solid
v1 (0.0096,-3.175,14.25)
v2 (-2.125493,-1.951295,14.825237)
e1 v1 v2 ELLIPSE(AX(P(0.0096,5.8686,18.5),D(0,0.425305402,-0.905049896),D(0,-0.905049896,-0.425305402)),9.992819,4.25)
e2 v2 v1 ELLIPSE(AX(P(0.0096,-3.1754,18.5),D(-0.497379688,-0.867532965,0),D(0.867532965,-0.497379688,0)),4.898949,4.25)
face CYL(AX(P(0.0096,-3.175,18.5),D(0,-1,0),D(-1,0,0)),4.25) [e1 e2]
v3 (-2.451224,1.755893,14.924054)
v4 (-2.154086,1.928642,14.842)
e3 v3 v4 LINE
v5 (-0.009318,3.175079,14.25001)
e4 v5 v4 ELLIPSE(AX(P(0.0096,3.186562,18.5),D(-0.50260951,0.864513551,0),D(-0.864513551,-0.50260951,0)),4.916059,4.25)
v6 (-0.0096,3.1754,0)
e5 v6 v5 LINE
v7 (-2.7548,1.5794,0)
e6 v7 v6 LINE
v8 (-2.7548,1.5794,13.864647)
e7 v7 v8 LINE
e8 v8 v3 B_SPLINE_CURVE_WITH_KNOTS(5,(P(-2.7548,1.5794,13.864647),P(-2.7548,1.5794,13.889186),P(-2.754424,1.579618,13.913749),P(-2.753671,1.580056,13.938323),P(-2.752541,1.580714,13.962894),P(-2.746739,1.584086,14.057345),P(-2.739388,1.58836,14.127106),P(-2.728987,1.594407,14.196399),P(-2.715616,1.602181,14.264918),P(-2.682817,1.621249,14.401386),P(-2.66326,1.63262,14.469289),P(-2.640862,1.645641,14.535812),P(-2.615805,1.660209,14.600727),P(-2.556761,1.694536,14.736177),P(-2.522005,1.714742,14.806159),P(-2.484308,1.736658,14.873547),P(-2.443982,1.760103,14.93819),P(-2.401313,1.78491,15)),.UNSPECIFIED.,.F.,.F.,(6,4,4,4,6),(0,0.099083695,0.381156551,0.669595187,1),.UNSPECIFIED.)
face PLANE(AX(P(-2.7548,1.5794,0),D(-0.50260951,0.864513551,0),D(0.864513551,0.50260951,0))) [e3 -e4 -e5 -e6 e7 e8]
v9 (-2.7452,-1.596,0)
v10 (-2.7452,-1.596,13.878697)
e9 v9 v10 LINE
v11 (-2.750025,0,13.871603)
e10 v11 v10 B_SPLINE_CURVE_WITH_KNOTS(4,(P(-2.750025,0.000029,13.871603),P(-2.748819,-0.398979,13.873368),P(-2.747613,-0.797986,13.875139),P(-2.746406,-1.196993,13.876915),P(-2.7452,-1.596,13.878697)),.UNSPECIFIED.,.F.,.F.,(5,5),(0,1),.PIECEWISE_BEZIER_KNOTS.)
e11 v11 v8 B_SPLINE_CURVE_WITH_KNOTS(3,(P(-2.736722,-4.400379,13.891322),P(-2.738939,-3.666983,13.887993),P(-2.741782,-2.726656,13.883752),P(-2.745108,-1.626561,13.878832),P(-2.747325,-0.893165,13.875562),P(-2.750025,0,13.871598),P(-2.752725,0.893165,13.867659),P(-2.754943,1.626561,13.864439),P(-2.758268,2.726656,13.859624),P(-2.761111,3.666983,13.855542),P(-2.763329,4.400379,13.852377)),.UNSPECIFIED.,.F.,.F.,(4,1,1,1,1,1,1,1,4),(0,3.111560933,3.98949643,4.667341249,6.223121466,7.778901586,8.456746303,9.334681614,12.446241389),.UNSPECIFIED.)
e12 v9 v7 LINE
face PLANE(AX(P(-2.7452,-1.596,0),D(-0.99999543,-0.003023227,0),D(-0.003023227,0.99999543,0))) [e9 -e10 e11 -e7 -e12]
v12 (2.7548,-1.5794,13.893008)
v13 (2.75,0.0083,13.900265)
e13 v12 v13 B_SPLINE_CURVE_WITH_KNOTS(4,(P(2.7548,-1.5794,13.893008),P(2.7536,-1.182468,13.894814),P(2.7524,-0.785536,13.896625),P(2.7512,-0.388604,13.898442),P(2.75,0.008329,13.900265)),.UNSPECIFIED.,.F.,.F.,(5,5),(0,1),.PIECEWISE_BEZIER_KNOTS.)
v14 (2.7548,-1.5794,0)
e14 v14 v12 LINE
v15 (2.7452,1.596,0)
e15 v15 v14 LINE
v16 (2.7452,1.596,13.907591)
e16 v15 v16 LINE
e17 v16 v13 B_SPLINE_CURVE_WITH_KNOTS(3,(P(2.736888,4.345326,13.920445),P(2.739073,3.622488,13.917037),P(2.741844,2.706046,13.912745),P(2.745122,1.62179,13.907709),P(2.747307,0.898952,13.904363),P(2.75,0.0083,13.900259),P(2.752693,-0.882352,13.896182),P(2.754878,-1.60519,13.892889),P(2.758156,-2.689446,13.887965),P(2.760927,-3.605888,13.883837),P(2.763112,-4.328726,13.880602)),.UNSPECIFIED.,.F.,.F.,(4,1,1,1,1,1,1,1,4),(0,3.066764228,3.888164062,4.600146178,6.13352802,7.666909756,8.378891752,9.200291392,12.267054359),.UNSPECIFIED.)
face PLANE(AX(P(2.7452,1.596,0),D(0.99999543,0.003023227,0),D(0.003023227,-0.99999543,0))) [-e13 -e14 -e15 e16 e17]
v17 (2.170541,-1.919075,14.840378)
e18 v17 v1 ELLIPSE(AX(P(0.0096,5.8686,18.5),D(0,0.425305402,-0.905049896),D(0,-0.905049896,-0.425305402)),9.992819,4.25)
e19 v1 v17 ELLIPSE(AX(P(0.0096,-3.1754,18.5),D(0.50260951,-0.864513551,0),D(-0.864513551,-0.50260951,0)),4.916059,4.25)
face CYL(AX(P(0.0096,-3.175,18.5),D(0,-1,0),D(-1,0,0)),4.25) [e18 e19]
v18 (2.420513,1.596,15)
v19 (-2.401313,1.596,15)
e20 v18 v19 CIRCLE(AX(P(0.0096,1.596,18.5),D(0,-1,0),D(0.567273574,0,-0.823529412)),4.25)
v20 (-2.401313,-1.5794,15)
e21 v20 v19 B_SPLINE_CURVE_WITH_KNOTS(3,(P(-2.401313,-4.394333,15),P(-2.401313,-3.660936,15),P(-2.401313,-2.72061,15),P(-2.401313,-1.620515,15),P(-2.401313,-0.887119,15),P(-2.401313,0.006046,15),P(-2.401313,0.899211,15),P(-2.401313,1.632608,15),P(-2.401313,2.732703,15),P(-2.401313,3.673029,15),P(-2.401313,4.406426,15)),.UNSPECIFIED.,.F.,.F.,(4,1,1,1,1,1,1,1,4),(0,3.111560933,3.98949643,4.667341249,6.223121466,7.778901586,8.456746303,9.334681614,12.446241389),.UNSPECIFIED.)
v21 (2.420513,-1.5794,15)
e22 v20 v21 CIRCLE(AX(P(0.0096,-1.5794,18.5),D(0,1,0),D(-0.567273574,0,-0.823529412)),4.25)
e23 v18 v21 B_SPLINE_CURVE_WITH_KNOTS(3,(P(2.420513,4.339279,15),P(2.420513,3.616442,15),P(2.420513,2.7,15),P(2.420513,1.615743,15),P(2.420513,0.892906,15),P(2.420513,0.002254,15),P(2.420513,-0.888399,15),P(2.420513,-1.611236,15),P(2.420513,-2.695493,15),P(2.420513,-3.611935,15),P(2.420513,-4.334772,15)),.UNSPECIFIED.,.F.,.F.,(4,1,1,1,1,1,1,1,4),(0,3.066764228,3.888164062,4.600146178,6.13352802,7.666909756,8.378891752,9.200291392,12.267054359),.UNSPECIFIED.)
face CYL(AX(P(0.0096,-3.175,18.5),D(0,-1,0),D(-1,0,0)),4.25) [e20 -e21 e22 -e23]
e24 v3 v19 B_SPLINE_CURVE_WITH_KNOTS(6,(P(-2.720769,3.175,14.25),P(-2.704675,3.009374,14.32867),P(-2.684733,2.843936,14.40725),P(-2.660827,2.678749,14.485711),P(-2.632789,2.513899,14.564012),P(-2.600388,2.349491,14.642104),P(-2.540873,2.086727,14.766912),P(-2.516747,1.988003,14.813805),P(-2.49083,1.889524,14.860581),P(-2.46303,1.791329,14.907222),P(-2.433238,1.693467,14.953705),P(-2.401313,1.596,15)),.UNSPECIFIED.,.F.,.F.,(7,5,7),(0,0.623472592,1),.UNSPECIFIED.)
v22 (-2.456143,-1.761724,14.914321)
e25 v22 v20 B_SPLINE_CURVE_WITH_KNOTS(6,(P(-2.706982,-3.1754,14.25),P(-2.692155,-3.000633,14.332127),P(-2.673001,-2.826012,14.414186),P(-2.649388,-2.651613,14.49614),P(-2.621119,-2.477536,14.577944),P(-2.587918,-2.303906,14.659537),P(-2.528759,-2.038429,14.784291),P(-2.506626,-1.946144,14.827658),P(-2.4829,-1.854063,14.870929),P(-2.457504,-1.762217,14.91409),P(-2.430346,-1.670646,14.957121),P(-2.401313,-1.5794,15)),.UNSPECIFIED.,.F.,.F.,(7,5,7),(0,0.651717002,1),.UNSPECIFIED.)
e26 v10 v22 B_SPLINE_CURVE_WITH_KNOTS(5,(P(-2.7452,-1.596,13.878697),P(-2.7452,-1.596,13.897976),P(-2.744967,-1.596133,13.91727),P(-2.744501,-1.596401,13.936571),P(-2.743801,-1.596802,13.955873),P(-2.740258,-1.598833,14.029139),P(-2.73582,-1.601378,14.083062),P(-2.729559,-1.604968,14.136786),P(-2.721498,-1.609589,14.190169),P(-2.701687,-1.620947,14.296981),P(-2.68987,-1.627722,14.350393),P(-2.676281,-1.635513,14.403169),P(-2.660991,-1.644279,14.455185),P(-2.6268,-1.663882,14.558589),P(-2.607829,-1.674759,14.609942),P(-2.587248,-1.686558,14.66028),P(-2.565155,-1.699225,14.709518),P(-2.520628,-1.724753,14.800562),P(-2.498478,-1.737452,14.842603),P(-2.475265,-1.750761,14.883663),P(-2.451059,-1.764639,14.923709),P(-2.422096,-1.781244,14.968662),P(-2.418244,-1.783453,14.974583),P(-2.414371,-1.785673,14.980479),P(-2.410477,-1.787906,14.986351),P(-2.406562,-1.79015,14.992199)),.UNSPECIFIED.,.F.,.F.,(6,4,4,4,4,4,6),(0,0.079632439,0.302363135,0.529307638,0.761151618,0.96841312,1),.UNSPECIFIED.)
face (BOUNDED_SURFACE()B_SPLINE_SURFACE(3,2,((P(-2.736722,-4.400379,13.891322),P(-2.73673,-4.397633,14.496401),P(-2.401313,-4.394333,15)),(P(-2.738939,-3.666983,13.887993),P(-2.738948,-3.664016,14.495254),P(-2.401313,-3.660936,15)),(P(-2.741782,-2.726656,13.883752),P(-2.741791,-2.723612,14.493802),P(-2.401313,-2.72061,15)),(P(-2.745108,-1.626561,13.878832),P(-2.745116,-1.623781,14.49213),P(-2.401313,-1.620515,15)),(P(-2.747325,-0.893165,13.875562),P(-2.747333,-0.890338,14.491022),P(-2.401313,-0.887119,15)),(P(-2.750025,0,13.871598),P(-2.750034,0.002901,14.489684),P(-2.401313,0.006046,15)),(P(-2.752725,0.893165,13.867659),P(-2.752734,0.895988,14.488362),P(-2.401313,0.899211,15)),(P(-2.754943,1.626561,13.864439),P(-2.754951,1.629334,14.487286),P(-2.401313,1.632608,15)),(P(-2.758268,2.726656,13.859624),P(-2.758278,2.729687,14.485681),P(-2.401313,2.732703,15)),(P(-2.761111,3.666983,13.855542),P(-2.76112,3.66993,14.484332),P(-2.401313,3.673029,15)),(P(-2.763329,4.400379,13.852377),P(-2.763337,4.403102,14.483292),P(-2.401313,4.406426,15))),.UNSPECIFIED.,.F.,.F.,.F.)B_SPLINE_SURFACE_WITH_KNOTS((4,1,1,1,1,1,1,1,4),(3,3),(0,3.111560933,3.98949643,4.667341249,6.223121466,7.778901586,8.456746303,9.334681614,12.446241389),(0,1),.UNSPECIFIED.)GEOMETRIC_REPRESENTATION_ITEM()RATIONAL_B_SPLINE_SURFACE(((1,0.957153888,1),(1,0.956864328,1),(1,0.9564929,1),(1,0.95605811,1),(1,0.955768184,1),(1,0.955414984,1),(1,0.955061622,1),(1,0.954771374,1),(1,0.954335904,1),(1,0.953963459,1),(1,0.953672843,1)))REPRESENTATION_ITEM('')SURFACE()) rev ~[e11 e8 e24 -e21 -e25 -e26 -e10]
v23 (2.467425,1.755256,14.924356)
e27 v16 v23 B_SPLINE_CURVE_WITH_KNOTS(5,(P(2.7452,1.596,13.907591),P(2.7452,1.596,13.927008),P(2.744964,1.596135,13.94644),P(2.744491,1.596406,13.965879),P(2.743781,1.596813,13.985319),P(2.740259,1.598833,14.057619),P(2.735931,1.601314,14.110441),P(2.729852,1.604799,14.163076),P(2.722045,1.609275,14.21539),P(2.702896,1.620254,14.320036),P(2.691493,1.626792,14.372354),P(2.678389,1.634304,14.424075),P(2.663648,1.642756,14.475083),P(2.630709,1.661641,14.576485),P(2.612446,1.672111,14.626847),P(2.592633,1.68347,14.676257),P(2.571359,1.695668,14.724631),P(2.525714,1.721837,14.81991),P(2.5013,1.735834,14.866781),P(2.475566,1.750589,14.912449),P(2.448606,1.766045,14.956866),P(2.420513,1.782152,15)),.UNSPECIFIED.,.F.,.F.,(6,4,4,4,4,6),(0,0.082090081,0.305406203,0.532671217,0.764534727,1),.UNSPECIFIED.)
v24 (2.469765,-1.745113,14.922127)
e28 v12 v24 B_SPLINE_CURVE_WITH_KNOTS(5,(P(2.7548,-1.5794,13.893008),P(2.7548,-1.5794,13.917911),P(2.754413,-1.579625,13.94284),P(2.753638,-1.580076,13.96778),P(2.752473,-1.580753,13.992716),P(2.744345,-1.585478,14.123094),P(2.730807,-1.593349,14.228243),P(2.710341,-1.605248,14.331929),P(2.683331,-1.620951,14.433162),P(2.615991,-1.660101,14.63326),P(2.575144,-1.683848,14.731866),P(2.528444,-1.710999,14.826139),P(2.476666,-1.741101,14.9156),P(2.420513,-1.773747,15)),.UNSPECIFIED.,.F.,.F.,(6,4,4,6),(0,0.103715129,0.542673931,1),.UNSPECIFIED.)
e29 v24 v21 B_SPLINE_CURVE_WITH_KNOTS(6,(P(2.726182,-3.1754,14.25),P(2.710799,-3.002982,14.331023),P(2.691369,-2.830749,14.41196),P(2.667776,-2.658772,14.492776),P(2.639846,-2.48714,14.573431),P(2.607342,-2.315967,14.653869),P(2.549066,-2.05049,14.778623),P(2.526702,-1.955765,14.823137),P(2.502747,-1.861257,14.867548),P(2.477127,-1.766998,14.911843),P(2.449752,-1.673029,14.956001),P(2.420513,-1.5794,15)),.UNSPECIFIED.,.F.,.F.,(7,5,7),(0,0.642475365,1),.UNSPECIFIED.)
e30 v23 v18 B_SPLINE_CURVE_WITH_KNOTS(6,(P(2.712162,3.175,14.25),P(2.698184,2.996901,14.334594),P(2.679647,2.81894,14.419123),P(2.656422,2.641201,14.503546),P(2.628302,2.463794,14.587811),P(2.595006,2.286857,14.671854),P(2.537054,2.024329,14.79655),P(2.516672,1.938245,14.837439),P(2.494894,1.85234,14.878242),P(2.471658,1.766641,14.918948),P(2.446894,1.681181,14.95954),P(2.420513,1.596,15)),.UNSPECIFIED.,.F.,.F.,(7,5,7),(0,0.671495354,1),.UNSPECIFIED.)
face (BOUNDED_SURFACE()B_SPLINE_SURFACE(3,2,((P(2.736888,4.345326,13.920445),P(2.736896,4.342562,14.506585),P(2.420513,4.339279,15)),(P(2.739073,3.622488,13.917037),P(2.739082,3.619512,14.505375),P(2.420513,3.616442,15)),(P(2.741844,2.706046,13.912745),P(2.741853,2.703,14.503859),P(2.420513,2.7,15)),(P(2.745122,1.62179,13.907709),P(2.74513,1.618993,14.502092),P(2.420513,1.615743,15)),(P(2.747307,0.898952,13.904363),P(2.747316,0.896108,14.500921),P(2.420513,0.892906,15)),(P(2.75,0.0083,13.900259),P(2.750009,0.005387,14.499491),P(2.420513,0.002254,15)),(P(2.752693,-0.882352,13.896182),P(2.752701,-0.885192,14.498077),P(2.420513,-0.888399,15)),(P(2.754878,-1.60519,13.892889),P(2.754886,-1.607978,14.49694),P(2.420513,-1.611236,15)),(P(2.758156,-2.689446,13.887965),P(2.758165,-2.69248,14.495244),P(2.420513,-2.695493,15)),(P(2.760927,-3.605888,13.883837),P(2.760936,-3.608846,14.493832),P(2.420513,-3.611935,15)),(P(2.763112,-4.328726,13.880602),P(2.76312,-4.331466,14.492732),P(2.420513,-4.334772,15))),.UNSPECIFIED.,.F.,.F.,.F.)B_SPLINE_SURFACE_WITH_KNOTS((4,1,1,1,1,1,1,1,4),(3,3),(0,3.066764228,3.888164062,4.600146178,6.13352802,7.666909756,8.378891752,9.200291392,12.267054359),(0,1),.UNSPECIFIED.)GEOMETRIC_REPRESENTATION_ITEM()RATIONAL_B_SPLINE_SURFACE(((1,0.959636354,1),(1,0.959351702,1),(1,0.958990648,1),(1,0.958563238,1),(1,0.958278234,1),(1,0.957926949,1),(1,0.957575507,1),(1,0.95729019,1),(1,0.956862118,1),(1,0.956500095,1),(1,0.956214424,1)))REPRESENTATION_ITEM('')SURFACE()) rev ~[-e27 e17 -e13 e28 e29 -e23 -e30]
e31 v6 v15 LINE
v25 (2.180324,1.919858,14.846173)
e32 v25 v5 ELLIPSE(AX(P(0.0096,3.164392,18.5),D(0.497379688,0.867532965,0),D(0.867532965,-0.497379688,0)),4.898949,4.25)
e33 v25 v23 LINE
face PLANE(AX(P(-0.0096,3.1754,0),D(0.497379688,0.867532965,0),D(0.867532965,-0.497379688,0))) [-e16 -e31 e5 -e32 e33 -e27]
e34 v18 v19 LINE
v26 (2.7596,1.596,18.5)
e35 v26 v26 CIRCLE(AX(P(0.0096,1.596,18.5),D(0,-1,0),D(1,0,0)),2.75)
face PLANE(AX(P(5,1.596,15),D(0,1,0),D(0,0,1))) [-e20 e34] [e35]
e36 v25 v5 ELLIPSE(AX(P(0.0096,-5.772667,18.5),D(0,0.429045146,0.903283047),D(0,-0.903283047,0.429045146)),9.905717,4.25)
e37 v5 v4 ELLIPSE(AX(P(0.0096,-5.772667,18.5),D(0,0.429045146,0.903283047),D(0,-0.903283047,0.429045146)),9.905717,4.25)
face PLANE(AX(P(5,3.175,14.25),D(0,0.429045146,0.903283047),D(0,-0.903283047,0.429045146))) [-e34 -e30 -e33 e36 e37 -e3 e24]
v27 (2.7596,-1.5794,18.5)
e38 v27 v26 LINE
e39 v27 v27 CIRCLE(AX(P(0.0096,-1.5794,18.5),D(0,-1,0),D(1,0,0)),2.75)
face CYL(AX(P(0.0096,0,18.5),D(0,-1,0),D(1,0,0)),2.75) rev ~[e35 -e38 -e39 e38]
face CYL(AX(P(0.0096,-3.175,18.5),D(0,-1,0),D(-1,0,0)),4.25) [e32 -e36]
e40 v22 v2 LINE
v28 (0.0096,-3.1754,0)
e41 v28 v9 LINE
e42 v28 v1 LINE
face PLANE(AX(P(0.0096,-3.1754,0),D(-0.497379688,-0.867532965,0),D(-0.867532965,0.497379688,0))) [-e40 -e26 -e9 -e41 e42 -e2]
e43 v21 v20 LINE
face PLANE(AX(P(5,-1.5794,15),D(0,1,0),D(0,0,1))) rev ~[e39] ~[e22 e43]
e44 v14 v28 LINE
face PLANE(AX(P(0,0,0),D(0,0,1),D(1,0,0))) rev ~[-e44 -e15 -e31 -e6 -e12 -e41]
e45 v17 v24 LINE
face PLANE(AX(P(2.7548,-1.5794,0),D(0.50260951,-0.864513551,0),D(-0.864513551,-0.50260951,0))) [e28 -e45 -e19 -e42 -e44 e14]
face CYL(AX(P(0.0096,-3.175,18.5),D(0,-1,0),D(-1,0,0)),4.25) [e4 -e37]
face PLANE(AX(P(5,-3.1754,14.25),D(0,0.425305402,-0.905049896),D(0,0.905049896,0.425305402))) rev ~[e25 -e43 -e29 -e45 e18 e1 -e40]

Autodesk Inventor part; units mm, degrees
sketch "Boceto1" plane through (0, 0, 0) normal (0, 0, 1) x (1, 0, 0)
  line L0 (2.7452, 1.596) -> (2.7548, -1.5794)
  line L1 (2.7548, -1.5794) -> (0.0096, -3.1754)
  line L2 (0.0096, -3.1754) -> (-2.7452, -1.596)
  line L3 (-2.7452, -1.596) -> (-2.7548, 1.5794)
  line L4 (-2.7548, 1.5794) -> (-0.0096, 3.1754)
  line L5 (-0.0096, 3.1754) -> (2.7452, 1.596)
  point P0 (0, 0)
  point P1 (0, 0)
  dimension "d0" = 5.5
  dimension "d20" = 6.3508
extrude "Extrusión1" add sketch "Boceto1" along normal blind 15
ref_plane "Plano de trabajo4" through (-2.7452, -1.596, 0) normal (0, 0, -1) x (-1, 0, 0)
sketch "Boceto2" plane through (-2.7452, -1.596, 0) normal (0, 0, -1) x (-1, 0, 0)
  line L0 (-2.7548, -1.5794) -> (1.0358, -1.5794)
  line L1 (1.0358, -1.5794) -> (-2.7548, -1.5794)
  line L2 (-5.6299, -1.5794) -> (-2.7548, -1.5794)
  point P0 (-2.7452, 1.596)
  dimension "d5" = 3.1754
ref_plane "Plano de trabajo5" through (0, -3.175, 0) normal (0, 1, 0) x (-1, 0, 0)
sketch "Boceto3" plane through (0, -3.175, 0) normal (0, 1, 0) x (-1, 0, 0)
  line L0 (-0.0096, 15) -> (-2.7548, 15) projected
  line L1 (2.6199, 14) -> (-2.7548, 14) construction
  line L2 (-0.0096, 0) -> (-0.0096, 15) projected
  line L3 (-0.0096, 14) -> (-0.0096, 18.5)
  circle A0 centre (-0.0096, 18.5) radius 4.25
  circle A1 centre (-0.0096, 18.5) radius 2.75
  point P0 (0, 0)
  dimension "d7" = 1
  dimension "d8" = 4.5
  dimension "d9" = 8.5
  dimension "d14" = 5.5
sketch "Boceto4" plane through (-2.7452, -1.596, 0) normal (0, 0, -1) x (-1, 0, 0)
  point P0 (-2.7452, 1.596)
  point P1 (-2.7356, 4.7714)
  point P2 (-2.7548, -1.579)
  dimension "d10" = 6.3504
extrude "Extrusión2" add sketch "Boceto3" along normal blind 6.35 contours L2 A0 L0 | L0 A0 L2 | A1
ref_plane "Barreno" through (0, 0, 0) normal (0, -1, 0) x (1, 0, 0)
sketch "Boceto6" plane through (0, 0, 0) normal (0, -1, 0) x (1, 0, 0)
  arc A0 (0.0103, 14.25) -> (0.0089, 14.25) centre (0.0096, 18.5) ccw projected
  circle A1 centre (0.0096, 18.5) radius 2.75 projected
  point P0 (0, 0)
  dimension "d13" = 4.25
extrude "Extrusión3" cut sketch "Boceto6" along normal mid plane 10 contours A1
ref_plane "Plano de trabajo8" through (5, 0, 0) normal (1, 0, 0) x (0, 1, 0)
sketch "Boceto8" plane through (5, 0, 0) normal (1, 0, 0) x (0, 1, 0)
  line L0 (-3.175, 15.75) -> (-3.175, 21.25) projected
  line L1 (-3.1754, 14.25) -> (-1.5794, 15)
  line L2 (-1.5794, 15) -> (-1.5794, 22.75)
  line L3 (-1.5794, 22.75) -> (-3.175, 22.75)
  line L4 (3.175, 14.25) -> (1.596, 15)
  line L5 (1.596, 15) -> (1.596, 22.75)
  line L6 (1.596, 22.75) -> (3.175, 22.75)
  ellipse E0 centre (3.1866, 18.5) end of major axis (3.1866, 14.25) minor radius 2.4709 (1.7849, 15) -> (3.175, 14.25) ccw projected
  line L7 (-3.175, 22.75) -> (-6.1952, 22.75)
  line L8 (-6.1952, 22.75) -> (-6.1952, 14.0055)
  line L9 (-6.1952, 14.0055) -> (-3.1754, 14.25)
  line L10 (3.175, 14.25) -> (7.2865, 13.4418)
  line L11 (7.2865, 13.4418) -> (6.5328, 22.75)
  line L12 (6.5328, 22.75) -> (3.175, 22.75)
  point P0 (0, 0)
  point P1 (-1.5794, 15)
extrude "Extrusión4" cut sketch "Boceto8" against normal blind 10 contours L9 L8 L7 L3 L2 L1 | L4 L5 L6 L12 L11 L10
fillet "Empalme1" radius 2 1 edges at (-2.75, 0, 15)
fillet "Empalme2" radius 2 1 edges at (2.75, 0.0083, 15)
properties part number "Cabezal" material "Plástico ABS"
